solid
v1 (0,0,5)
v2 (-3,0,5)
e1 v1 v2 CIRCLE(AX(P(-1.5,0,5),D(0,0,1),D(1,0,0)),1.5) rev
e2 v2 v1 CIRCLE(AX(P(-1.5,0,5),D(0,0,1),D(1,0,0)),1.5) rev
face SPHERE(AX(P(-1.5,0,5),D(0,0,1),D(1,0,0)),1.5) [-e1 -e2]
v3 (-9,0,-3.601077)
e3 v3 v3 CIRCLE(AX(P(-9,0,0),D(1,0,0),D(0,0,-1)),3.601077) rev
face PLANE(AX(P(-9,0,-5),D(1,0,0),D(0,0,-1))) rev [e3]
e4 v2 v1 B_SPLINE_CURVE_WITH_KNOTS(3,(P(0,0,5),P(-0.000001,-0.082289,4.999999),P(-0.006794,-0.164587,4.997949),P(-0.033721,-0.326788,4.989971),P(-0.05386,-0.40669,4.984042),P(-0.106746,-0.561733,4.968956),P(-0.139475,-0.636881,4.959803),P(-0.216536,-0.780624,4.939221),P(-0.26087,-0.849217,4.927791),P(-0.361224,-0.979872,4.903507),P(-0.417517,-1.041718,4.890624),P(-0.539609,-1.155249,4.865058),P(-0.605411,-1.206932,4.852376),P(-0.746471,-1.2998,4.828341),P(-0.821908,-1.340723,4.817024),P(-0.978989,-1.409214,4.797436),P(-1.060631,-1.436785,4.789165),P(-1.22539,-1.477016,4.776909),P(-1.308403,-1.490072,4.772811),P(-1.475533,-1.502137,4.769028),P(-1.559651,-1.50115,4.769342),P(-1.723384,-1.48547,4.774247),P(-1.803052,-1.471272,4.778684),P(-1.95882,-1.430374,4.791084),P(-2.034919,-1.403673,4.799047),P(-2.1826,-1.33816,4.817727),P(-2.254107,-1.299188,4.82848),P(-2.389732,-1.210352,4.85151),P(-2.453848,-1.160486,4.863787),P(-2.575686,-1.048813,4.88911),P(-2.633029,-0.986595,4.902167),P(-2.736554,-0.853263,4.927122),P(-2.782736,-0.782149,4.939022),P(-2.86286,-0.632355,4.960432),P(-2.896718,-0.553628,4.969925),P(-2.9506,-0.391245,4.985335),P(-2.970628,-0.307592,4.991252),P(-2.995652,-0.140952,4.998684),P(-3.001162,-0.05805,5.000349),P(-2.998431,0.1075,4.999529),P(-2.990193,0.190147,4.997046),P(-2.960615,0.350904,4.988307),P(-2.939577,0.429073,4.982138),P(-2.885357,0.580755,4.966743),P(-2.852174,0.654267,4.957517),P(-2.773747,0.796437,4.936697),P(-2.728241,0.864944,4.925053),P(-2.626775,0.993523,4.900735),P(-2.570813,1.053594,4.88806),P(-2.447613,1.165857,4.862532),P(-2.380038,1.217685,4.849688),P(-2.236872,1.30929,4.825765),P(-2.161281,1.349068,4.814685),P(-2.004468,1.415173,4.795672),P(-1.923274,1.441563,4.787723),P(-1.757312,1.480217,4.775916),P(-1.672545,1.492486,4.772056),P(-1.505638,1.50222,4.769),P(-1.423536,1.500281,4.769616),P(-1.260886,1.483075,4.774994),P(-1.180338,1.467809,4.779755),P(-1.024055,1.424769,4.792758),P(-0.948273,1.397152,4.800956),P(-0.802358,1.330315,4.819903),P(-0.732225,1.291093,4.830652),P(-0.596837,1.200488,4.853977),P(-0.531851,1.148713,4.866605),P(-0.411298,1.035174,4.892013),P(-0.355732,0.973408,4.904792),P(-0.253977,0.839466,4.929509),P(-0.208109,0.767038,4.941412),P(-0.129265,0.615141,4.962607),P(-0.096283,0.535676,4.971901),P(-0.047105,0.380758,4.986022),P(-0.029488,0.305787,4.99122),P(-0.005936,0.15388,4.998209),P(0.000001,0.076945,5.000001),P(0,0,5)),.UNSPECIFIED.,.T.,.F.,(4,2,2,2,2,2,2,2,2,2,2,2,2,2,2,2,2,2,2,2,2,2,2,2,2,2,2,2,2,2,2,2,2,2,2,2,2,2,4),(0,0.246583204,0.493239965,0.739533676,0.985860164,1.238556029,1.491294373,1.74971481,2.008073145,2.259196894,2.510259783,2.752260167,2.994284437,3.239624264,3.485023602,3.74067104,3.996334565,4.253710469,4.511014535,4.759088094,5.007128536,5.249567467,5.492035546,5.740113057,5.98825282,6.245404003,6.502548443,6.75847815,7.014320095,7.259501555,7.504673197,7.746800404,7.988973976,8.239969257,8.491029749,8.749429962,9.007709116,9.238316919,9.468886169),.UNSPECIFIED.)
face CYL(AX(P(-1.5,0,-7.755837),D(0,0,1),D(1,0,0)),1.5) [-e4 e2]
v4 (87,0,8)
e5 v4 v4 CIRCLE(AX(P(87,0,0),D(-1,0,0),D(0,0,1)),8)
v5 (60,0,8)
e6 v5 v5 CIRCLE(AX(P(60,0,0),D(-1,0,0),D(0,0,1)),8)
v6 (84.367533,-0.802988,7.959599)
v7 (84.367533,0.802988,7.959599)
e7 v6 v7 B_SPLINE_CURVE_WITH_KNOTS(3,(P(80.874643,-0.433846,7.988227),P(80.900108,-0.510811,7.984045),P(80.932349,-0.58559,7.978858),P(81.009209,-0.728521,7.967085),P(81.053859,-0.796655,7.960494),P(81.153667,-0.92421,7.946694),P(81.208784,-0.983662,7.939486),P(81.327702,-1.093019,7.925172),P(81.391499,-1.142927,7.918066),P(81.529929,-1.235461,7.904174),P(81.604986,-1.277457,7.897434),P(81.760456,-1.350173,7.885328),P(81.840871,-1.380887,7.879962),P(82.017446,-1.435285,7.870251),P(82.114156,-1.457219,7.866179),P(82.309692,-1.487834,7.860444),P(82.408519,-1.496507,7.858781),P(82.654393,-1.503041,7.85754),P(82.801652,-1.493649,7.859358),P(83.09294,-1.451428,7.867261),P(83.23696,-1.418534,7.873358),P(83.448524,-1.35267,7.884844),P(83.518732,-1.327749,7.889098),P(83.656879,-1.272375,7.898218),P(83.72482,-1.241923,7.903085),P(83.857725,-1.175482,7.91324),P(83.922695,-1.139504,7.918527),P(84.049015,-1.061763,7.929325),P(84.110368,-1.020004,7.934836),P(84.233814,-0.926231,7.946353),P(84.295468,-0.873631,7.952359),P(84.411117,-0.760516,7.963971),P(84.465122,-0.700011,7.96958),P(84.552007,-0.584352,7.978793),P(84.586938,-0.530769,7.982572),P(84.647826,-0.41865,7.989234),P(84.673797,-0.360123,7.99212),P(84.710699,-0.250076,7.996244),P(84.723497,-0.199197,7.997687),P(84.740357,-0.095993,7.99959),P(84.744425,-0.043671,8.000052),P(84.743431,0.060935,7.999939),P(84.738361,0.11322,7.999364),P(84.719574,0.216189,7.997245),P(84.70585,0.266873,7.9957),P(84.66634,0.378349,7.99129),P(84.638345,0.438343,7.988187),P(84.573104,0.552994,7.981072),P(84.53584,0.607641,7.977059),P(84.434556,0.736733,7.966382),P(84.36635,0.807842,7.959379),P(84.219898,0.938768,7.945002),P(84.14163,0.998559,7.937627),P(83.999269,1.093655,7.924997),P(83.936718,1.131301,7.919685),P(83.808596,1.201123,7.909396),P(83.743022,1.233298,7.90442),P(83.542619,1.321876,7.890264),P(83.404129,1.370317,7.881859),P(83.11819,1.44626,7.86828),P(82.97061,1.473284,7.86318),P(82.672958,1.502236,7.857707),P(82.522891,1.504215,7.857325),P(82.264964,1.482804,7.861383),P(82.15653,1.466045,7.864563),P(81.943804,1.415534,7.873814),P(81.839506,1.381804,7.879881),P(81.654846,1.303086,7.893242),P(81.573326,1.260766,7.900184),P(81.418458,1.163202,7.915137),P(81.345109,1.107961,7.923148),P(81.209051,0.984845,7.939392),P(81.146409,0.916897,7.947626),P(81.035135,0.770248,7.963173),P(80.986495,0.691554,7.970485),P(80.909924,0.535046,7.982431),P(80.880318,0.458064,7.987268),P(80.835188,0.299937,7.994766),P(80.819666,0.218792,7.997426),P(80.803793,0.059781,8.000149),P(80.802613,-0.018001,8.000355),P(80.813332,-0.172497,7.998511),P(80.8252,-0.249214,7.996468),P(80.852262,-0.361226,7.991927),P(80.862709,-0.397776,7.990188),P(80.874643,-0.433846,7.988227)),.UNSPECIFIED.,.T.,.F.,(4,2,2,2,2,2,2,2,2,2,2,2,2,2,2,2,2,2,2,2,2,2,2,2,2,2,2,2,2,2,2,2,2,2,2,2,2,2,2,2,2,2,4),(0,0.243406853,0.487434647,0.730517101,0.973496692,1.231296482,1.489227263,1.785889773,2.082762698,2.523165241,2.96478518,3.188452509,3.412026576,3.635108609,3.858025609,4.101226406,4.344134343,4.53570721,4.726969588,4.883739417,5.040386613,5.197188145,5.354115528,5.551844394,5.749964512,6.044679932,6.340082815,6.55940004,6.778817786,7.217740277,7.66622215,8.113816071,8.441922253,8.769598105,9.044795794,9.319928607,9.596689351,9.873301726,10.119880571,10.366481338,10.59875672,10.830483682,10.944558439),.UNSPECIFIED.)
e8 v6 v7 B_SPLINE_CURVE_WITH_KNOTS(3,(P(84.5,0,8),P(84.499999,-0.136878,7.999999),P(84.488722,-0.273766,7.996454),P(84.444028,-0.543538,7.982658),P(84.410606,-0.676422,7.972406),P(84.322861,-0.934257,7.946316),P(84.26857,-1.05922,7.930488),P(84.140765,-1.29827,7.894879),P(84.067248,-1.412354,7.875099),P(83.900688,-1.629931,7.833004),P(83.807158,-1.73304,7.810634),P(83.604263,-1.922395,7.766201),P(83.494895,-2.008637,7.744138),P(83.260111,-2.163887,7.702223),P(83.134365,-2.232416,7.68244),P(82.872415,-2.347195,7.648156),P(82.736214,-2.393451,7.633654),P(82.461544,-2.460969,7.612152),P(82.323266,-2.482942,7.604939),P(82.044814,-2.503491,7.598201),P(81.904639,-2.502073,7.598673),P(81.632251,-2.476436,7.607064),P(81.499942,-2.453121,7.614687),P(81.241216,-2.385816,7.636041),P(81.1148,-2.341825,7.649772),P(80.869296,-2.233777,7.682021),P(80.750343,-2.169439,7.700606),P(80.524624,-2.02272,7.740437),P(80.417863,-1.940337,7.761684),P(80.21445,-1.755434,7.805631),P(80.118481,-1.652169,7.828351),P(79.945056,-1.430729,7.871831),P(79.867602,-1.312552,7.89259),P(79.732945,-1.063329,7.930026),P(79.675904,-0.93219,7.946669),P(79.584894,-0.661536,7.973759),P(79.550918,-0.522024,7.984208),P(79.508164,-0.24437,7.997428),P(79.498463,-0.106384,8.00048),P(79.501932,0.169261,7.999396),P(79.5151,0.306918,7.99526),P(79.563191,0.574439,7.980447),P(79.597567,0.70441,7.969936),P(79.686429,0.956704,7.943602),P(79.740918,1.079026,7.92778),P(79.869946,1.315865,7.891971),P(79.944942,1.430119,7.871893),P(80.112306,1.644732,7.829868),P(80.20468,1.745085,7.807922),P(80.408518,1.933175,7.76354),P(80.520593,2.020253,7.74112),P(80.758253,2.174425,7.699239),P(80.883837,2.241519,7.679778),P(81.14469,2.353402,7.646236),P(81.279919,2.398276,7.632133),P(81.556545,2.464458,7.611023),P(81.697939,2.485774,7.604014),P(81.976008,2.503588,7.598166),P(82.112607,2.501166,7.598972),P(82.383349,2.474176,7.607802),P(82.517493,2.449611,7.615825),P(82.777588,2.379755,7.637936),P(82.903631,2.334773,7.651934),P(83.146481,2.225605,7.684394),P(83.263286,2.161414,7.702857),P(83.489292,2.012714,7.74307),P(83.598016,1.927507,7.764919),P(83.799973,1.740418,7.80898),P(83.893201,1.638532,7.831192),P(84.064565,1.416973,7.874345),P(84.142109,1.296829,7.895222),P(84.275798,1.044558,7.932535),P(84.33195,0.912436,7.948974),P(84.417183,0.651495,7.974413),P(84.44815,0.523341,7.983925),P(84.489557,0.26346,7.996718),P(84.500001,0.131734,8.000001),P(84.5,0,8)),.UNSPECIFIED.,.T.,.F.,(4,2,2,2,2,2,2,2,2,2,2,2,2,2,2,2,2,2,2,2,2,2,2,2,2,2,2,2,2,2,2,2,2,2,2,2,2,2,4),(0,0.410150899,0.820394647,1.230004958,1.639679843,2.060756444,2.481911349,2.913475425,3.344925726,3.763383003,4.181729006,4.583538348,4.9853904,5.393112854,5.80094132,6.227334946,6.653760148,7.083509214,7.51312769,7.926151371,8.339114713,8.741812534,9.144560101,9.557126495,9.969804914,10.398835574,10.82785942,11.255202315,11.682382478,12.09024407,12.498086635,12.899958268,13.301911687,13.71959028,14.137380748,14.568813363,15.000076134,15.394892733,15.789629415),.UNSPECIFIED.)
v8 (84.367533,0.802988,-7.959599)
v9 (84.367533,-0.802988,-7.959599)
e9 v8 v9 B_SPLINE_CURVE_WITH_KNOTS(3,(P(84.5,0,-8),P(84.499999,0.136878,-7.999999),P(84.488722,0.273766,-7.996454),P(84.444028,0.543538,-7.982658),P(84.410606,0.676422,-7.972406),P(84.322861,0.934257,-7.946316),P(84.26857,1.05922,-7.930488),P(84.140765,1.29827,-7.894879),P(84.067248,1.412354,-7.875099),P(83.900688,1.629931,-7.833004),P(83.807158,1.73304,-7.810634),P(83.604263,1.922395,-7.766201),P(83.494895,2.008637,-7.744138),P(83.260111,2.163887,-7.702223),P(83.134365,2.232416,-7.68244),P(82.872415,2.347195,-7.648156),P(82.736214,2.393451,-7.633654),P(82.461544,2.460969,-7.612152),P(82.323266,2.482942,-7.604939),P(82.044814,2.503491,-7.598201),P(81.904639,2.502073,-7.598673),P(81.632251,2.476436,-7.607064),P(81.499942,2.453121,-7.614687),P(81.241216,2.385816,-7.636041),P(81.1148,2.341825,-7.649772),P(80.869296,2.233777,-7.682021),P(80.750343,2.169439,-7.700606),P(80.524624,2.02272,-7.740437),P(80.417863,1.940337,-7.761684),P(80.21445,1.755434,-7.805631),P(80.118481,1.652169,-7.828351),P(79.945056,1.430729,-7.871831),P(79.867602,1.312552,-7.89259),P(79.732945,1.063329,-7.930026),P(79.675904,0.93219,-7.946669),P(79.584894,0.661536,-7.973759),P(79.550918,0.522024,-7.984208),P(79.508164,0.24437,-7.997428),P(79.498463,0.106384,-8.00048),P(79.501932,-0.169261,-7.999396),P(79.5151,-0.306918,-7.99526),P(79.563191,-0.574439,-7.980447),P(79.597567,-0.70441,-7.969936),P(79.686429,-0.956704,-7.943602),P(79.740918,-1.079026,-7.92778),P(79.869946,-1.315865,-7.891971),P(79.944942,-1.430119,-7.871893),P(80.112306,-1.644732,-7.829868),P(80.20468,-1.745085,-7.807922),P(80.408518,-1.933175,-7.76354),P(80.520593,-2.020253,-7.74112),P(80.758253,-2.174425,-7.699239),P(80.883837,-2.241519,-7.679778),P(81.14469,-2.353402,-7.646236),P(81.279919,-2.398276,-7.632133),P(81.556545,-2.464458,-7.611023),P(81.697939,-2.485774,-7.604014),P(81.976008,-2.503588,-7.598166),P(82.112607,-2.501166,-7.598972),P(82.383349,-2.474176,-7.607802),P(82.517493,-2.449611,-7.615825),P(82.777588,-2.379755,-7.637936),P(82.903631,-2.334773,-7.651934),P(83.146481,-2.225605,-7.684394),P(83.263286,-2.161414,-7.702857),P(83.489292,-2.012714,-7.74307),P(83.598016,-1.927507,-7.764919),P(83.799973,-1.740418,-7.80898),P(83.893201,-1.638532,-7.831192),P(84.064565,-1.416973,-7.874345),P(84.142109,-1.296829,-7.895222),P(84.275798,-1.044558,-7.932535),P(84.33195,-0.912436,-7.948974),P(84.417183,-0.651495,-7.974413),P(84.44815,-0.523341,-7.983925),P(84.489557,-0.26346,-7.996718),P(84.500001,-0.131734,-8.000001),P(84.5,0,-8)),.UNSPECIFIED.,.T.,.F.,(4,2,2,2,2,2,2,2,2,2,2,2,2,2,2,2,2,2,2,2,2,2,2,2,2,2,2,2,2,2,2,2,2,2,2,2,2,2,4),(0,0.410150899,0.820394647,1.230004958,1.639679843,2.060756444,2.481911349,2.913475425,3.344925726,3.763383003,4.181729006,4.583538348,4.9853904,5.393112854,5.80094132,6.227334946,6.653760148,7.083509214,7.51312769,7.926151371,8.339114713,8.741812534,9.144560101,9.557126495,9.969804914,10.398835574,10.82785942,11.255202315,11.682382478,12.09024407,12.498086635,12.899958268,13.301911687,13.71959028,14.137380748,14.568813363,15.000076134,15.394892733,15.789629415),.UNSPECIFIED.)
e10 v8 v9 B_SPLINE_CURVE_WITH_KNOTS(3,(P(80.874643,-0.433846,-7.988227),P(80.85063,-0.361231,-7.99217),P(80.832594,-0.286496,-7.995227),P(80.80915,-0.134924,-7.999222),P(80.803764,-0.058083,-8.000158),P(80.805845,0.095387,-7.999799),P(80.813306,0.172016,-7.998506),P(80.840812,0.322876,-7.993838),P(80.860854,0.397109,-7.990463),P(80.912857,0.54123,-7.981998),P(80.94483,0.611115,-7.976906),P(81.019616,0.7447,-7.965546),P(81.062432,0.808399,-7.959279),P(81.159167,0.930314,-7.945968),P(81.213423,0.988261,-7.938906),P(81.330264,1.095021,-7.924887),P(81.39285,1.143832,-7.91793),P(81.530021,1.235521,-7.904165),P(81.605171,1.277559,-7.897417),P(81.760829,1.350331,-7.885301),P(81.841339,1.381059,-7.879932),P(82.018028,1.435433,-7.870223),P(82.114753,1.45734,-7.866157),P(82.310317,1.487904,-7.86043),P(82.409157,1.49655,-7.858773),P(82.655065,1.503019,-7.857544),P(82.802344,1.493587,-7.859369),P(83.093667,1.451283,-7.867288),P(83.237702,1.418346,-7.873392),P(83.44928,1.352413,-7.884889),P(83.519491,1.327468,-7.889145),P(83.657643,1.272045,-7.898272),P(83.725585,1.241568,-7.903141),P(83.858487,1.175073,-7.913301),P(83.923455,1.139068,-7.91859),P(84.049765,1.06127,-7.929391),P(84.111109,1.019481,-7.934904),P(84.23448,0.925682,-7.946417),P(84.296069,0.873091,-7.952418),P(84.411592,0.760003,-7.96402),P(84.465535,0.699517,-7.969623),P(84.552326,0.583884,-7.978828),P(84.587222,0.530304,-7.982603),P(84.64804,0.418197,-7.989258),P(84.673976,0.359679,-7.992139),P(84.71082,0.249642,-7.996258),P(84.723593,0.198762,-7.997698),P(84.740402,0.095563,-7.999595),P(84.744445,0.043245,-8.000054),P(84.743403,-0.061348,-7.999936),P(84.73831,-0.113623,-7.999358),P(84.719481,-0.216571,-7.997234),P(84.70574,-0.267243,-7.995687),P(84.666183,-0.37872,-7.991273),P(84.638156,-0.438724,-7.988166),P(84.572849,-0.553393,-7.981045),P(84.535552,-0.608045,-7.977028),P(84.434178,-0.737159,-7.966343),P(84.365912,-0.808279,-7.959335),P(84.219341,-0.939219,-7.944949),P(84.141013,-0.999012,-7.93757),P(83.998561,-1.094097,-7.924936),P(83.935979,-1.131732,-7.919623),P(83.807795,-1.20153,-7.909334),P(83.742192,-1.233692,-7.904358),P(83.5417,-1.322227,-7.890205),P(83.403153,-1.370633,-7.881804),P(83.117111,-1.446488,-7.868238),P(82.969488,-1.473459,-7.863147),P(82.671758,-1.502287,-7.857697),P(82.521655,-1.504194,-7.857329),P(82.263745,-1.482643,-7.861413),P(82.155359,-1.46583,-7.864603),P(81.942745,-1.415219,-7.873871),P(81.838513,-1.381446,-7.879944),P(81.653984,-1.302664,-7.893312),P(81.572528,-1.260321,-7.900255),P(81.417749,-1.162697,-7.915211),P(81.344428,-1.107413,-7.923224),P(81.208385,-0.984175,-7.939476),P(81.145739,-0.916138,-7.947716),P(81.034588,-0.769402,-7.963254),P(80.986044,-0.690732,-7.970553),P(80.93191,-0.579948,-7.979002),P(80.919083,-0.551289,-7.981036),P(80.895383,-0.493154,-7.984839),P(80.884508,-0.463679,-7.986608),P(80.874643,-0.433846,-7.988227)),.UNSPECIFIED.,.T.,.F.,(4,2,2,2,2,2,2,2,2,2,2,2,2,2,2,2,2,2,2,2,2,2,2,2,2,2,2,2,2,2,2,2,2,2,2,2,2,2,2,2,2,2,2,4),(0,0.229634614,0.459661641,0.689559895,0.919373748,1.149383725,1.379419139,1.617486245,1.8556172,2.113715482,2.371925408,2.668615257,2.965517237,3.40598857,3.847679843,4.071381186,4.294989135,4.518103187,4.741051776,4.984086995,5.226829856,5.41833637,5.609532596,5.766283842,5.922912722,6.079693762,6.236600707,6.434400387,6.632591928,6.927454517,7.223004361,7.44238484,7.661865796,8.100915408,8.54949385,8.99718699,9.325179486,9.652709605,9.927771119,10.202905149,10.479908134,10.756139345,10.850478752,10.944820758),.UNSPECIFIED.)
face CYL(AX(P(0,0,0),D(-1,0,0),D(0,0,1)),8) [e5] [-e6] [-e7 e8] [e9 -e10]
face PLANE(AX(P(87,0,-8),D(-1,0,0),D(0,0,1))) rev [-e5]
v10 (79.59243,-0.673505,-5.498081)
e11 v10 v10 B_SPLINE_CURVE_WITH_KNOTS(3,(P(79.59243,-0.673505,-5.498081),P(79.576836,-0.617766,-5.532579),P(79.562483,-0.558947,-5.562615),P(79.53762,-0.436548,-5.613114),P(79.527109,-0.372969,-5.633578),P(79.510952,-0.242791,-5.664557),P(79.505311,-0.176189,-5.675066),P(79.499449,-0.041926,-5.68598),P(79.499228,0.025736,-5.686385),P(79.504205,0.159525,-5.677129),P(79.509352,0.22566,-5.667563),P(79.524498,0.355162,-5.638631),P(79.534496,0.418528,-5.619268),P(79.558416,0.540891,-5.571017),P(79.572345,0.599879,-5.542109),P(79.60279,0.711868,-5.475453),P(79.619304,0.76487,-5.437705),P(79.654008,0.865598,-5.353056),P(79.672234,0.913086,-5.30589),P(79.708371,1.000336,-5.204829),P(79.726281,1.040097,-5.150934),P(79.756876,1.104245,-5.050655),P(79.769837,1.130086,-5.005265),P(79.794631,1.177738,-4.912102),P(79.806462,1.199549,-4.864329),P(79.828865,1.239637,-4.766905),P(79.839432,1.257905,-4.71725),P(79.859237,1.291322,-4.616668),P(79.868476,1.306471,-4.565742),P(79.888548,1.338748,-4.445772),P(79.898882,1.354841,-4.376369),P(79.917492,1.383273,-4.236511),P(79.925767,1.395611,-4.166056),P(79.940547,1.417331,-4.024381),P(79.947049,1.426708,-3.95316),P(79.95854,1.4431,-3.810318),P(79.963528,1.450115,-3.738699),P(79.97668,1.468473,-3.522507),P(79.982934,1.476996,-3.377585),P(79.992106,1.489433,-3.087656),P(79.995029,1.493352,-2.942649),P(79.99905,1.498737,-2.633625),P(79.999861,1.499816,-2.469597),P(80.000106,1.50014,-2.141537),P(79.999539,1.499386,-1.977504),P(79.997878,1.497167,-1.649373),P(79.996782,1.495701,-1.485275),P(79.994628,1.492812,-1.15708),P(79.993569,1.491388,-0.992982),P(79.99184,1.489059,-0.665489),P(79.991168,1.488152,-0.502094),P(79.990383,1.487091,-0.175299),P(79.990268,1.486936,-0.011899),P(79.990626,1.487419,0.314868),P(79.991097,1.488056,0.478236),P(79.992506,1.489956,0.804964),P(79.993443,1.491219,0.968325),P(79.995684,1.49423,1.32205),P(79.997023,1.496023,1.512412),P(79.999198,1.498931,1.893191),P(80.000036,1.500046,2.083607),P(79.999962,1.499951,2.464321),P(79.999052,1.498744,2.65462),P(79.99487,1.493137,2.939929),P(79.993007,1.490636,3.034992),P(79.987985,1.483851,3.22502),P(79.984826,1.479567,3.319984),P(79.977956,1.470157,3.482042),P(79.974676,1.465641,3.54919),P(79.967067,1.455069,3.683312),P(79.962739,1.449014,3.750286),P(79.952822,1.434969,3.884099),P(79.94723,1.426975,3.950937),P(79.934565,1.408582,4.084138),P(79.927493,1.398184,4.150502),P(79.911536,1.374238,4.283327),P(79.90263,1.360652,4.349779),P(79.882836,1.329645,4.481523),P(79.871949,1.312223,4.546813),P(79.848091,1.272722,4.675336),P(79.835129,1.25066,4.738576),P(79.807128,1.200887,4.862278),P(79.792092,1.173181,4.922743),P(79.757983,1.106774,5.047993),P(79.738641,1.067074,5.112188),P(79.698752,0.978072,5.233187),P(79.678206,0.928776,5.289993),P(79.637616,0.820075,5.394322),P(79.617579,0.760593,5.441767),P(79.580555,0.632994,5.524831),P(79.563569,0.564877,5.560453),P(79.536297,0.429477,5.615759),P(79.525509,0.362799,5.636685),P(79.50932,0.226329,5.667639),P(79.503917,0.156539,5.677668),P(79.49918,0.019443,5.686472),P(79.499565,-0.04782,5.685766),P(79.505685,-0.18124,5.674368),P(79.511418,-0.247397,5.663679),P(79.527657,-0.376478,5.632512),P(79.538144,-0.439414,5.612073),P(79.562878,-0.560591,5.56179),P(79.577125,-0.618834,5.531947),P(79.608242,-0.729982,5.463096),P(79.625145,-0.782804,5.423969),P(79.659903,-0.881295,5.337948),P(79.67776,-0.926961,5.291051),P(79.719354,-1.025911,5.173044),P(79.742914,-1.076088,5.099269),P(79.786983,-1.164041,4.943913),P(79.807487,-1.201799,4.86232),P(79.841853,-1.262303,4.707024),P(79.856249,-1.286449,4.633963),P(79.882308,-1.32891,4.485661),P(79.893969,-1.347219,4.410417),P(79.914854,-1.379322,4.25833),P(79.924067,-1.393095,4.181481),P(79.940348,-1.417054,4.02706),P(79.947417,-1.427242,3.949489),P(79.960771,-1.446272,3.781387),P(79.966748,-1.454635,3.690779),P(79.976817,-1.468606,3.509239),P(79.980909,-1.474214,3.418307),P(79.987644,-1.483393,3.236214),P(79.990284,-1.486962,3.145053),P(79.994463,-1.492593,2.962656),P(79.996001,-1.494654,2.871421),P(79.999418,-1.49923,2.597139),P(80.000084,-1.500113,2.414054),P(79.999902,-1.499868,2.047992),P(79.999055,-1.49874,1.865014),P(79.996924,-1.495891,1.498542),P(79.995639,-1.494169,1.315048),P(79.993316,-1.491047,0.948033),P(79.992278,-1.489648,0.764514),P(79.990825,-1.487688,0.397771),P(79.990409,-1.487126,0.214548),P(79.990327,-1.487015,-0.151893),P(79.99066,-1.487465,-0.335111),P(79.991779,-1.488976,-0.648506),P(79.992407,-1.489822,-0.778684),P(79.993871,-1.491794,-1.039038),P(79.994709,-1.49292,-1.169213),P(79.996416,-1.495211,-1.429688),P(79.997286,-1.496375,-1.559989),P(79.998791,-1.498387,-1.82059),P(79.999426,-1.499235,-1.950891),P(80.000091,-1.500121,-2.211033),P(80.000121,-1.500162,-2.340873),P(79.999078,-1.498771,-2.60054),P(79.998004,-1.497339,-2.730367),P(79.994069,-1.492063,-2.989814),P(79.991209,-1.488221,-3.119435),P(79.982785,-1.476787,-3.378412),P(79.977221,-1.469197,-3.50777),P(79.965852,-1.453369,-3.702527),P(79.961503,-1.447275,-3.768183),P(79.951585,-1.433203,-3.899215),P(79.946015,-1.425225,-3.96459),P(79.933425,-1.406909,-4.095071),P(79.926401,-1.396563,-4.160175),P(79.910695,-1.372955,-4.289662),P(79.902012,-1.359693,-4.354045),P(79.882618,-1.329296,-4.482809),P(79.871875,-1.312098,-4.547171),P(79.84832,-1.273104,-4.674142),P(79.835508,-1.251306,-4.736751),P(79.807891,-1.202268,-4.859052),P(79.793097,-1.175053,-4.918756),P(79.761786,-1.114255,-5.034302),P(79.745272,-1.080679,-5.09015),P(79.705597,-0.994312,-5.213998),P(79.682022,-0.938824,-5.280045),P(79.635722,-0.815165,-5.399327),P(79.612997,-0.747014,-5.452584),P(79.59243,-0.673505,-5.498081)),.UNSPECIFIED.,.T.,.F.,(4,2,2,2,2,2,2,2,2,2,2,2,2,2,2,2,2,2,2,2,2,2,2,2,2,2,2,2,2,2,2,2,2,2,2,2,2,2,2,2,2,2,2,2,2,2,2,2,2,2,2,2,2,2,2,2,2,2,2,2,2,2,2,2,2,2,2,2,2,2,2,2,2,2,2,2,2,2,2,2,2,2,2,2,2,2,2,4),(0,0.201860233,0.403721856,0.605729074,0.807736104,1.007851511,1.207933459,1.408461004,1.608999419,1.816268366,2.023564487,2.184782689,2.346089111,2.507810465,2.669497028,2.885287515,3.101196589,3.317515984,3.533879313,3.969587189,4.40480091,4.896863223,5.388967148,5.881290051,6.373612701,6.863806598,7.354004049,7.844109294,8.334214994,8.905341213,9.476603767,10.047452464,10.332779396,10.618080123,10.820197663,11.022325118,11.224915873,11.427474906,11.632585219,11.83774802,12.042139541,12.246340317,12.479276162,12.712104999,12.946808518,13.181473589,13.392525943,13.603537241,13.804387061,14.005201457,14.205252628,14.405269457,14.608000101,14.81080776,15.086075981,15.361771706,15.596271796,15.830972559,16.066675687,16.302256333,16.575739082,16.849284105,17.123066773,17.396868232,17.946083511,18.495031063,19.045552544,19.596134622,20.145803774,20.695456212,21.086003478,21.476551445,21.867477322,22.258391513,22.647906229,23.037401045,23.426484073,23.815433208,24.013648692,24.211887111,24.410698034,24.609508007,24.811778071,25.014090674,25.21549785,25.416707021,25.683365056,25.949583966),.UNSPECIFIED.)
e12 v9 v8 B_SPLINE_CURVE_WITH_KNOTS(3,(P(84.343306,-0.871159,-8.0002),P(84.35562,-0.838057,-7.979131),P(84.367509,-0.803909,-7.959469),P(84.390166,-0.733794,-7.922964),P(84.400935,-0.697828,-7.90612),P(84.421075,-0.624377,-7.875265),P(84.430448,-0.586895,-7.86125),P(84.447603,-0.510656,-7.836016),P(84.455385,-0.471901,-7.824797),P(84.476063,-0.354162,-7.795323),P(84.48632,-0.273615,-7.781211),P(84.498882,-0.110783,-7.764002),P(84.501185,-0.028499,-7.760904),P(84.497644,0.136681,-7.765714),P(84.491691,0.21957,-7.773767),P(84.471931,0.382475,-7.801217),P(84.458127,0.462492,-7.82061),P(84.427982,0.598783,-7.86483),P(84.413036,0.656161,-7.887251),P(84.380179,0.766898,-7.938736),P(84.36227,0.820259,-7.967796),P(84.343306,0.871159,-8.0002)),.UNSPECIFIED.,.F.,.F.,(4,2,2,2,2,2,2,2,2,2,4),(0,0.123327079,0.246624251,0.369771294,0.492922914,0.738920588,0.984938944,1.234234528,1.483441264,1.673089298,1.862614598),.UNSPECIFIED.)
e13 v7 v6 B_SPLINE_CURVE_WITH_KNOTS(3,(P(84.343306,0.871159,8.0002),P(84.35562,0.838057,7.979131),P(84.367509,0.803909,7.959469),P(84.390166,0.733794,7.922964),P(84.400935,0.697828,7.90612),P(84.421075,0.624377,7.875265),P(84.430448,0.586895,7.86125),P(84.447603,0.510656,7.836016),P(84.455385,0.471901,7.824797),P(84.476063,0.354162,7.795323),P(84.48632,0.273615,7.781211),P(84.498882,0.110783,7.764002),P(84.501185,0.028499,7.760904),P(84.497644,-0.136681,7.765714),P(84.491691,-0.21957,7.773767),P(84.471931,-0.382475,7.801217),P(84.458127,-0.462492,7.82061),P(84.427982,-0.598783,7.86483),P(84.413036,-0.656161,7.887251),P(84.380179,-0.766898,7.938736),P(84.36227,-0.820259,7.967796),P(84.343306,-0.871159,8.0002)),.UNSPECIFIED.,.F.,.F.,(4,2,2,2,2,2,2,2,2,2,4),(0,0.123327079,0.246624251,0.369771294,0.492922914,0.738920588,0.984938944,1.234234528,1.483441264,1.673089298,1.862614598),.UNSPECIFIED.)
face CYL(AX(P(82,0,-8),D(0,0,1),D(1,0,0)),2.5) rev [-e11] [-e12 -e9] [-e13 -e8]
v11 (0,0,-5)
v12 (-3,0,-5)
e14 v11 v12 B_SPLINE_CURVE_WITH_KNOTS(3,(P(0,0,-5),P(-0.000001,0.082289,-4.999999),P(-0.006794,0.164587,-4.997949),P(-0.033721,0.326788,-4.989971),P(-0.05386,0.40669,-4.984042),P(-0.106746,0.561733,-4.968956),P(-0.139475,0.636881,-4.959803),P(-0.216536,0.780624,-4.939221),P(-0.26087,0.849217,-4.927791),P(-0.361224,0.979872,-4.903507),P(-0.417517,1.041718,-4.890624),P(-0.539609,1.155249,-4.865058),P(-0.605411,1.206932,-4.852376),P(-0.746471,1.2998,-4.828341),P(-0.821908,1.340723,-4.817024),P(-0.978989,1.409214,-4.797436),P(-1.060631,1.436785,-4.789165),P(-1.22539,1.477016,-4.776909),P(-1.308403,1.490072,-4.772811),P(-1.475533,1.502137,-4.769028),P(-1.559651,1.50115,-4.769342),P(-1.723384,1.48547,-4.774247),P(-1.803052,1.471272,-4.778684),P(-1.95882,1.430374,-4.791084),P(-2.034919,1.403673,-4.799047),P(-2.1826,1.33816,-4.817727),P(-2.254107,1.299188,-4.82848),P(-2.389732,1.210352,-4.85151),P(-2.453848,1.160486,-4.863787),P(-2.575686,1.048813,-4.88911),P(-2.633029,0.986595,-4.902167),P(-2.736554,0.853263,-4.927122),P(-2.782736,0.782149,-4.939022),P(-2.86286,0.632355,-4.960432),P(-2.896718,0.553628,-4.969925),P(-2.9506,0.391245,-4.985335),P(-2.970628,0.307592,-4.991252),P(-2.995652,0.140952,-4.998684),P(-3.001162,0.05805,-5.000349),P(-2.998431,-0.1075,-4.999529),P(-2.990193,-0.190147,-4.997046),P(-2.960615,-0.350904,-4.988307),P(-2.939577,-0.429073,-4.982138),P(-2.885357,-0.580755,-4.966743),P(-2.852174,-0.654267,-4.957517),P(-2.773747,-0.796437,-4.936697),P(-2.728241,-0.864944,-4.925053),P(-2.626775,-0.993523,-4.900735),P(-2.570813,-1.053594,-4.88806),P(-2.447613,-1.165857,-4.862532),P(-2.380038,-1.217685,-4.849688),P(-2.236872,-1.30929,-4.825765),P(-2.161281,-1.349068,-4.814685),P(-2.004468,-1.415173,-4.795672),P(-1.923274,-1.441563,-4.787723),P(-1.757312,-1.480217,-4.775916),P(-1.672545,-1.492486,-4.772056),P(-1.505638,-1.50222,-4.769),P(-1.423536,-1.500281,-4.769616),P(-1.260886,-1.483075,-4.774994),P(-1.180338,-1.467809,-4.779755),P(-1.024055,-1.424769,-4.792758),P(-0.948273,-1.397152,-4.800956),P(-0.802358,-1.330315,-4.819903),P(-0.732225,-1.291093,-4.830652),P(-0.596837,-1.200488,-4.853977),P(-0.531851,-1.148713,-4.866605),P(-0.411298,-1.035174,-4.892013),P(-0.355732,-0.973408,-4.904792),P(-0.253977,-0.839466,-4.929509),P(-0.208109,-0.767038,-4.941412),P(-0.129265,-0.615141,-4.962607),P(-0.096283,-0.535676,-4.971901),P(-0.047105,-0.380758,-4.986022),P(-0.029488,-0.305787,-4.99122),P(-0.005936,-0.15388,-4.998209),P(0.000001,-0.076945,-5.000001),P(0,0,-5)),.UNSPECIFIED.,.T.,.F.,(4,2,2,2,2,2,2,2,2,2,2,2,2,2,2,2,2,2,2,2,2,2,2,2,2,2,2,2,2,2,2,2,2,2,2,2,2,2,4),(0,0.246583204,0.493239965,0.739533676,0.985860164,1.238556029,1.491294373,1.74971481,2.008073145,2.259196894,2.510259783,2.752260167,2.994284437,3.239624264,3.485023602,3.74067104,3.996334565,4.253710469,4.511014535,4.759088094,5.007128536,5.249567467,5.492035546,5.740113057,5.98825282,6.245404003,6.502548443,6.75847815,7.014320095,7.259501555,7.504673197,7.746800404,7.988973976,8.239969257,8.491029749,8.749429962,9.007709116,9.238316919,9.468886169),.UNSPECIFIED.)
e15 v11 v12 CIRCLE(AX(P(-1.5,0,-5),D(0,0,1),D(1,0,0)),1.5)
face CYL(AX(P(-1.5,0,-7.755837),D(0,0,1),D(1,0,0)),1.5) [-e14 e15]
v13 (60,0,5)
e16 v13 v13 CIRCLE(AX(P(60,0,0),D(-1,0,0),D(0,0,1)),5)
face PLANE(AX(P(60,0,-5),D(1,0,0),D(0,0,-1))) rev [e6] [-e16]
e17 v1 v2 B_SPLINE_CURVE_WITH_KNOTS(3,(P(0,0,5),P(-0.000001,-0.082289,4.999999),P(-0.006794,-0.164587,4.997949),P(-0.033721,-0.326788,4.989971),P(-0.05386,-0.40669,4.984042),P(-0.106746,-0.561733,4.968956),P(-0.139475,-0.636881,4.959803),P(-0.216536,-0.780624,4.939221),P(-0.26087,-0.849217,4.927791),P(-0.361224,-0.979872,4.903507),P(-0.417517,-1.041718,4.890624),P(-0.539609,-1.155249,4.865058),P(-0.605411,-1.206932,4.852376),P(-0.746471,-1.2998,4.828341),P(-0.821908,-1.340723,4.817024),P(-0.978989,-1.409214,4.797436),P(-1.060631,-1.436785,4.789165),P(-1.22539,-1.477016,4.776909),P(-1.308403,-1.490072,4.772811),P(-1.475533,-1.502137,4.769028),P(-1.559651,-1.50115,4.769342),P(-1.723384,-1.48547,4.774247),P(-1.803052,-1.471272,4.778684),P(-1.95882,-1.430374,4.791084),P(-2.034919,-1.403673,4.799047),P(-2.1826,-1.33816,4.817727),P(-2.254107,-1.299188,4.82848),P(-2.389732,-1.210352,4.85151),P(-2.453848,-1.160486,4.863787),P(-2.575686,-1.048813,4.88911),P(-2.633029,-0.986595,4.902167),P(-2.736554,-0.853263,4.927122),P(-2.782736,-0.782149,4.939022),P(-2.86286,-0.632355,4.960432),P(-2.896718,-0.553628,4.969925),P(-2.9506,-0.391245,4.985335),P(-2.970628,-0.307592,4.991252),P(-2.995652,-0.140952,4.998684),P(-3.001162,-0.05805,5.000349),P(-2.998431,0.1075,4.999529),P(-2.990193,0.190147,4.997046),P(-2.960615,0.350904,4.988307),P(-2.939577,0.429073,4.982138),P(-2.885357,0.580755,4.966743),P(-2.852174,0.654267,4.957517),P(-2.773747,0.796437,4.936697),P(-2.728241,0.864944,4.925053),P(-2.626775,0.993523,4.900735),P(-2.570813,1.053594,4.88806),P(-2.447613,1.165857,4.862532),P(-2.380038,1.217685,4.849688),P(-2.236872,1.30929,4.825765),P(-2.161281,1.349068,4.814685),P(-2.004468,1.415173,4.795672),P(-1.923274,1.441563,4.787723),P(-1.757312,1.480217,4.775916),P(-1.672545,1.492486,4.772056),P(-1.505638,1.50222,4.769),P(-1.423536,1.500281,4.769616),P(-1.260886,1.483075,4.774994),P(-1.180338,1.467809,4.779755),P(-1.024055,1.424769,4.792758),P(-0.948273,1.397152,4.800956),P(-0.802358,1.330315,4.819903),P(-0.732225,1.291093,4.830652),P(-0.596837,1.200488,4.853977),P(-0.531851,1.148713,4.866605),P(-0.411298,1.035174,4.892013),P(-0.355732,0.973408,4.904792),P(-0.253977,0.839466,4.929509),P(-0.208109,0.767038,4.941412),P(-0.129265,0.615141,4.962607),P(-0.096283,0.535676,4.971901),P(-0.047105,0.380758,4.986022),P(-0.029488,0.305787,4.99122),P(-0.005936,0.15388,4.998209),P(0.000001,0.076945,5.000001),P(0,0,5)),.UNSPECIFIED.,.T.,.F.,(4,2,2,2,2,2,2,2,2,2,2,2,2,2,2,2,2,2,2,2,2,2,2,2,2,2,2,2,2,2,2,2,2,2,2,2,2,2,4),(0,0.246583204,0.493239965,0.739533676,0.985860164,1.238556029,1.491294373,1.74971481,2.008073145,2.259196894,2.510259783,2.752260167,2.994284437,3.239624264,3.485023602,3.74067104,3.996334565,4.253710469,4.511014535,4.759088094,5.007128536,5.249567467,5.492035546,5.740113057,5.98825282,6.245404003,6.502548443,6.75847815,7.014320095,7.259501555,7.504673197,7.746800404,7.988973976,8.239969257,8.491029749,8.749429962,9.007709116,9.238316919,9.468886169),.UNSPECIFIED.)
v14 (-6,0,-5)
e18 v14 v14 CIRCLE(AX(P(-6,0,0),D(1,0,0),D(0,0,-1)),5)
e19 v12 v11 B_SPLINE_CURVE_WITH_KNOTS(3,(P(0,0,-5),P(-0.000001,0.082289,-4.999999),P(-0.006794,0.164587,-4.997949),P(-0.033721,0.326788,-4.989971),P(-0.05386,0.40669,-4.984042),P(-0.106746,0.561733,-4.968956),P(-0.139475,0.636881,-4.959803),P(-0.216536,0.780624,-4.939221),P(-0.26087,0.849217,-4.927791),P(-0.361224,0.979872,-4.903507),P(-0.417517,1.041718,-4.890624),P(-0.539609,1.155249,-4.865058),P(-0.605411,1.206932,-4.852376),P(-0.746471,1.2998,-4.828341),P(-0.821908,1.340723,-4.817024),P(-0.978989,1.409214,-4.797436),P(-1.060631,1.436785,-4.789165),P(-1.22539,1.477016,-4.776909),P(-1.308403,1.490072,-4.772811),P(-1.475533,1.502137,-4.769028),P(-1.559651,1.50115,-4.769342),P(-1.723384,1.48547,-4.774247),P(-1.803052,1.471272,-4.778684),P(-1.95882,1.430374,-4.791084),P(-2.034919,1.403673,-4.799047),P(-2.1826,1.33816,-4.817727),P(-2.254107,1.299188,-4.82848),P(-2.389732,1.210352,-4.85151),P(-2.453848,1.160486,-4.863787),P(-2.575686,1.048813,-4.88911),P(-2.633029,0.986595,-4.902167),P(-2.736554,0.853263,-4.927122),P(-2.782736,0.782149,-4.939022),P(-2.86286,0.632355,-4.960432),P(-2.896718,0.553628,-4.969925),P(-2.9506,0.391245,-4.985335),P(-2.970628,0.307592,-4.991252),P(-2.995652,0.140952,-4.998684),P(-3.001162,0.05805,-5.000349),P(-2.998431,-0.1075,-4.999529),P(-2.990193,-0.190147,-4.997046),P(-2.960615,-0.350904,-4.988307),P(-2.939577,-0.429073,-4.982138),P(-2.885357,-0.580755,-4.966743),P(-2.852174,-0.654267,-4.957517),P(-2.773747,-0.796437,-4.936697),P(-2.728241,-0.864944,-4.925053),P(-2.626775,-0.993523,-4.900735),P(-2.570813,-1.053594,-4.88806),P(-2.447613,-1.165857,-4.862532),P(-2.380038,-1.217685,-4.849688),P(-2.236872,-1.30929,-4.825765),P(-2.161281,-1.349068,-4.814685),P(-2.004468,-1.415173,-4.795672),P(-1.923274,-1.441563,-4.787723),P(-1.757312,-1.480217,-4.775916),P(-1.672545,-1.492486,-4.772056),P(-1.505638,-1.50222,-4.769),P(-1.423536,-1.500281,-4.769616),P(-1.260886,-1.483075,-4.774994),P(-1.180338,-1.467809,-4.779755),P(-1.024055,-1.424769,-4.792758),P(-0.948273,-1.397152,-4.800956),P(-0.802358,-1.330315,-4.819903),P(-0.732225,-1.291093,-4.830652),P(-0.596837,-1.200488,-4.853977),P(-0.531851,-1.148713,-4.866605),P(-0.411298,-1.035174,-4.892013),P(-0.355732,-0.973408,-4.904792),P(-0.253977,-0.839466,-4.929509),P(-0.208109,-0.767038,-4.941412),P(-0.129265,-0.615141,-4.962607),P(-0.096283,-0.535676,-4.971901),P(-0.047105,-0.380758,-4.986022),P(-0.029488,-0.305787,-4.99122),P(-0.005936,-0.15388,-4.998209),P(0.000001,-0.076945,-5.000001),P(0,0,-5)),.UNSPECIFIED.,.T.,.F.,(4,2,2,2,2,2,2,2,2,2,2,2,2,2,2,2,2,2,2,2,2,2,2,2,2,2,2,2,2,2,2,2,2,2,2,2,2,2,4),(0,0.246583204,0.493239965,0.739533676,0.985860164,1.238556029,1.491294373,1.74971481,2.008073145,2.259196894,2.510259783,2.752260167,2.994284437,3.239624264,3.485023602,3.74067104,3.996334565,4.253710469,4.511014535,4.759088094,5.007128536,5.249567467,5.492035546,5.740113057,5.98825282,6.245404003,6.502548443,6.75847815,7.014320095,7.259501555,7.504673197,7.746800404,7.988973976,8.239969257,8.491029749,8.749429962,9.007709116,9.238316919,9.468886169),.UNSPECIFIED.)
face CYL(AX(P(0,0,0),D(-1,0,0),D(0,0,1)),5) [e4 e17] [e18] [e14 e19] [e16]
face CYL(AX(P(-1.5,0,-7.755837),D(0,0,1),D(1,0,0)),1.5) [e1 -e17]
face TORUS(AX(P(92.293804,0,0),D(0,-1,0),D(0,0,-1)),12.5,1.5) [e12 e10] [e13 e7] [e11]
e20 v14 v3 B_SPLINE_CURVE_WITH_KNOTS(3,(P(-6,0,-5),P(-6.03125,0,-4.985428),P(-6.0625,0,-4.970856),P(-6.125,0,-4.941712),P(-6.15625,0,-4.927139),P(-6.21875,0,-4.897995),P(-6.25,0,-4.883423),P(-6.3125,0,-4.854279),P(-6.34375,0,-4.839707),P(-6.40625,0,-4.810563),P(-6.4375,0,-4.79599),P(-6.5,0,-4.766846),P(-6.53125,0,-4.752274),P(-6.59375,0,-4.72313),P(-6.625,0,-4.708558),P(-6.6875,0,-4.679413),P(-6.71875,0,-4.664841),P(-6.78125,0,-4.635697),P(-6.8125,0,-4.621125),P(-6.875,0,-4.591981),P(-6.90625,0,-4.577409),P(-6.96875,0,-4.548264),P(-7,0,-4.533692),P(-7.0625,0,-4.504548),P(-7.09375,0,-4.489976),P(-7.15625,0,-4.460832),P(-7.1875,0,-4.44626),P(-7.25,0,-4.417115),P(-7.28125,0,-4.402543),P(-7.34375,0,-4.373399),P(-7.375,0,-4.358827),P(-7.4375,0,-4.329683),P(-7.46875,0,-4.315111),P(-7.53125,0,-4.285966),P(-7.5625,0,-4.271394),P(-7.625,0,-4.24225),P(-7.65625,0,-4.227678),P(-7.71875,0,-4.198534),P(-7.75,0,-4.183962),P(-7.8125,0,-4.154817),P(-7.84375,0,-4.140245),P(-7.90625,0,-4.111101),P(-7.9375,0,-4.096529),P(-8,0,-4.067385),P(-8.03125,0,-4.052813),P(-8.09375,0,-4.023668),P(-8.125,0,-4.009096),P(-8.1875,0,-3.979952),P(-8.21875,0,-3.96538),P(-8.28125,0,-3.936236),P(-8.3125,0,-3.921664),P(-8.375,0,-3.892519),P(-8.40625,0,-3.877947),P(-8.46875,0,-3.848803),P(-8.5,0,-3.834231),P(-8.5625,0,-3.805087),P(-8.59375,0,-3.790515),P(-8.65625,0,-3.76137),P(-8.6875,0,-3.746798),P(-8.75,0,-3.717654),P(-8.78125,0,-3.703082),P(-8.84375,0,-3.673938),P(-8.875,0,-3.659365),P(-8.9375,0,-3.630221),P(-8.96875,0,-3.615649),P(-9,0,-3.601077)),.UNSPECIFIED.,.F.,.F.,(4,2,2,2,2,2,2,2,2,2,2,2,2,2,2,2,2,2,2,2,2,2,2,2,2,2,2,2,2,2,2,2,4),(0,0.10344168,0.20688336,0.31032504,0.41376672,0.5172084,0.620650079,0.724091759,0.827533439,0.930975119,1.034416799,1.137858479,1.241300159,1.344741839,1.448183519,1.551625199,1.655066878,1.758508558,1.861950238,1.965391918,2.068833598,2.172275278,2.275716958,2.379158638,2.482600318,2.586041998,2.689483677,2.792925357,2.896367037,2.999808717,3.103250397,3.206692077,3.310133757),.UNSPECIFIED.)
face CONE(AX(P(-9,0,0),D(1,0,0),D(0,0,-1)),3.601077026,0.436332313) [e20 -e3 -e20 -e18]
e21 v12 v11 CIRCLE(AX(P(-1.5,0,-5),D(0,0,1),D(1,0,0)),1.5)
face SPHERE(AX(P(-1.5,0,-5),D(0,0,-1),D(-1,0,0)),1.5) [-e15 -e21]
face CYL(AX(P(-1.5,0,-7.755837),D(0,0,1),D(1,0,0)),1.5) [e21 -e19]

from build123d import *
from build123d.topology import SkipClean

# Parameters (mm, degrees)
CHAMFER1_SIZE           = 3
CHAMFER1_SIZE2          = 1.398922974
SKETCH2_W               = 1.5
SKETCH2_H               = 13
FILLET1_R               = 1.5
CUT_EXTRUDE1_DEPTH      = 88.732548122
CUT_EXTRUDE1_DEPTH_BACK = 88.732548122
SKETCH3_R               = 2.5
SKETCH5_R               = 1.5


with BuildPart() as part:
    # Sketch1 → Revolve1 (revolve)
    with BuildSketch(Plane(origin=(0, 0, 0), x_dir=(1, 0, 0), z_dir=(0, 1, 0)), mode=Mode.PRIVATE) as revolve1_sk:
        Polygon((0, 5), (-9, 5), (-9, 0), (87, 0), (87, 8), (60, 8), (60, 5), align=None)
    revolve(revolve1_sk.sketch.rotate(Axis((0, 0, 0), (1, 0, 0)), 180), axis=Axis((0, 0, 0), (1, 0, 0)))

    # Chamfer1
    chamfer1_edges = [part.edges().sort_by_distance(p)[0] for p in [
        (-9, 0, -5),
    ]]
    chamfer1_side = [part.faces().sort_by_distance(p)[0] for p in [
        (25.5, 0, -5),
    ]]
    chamfer(chamfer1_edges, length=CHAMFER1_SIZE, length2=CHAMFER1_SIZE2, reference=chamfer1_side[0])

    # Sketch2 → Revolve2 (revolve)
    with BuildSketch(Plane(origin=(0, 0, 0), x_dir=(1, 0, 0), z_dir=(0, 1, 0))):
        with Locations((-0.75, 0)):
            Rectangle(SKETCH2_W, SKETCH2_H)
    revolve(axis=Axis((-1.5, 0, -7.755836722), (0, 0, -1)))

    # Fillet1
    fillet1_edges = [part.edges().sort_by_distance(p)[0] for p in [
        (-3, 0, -6.5),
        (-3, 0, 6.5),
    ]]
    fillet(fillet1_edges, radius=FILLET1_R - 0.0001)  # a hair under: the kernel refuses the full size

    # Sketch3 → Cut-Extrude1 (cut, two sides: drawn at the far end of the back side and taken through both)
    with BuildSketch(Plane.XY.offset(-CUT_EXTRUDE1_DEPTH_BACK)):
        with Locations((82, 0)):
            Circle(SKETCH3_R)
    extrude(amount=CUT_EXTRUDE1_DEPTH + CUT_EXTRUDE1_DEPTH_BACK, mode=Mode.SUBTRACT)

    # Sketch5 → Revolve3 (revolve)
    with SkipClean():  # the faces are left unmerged after this step: merging them gives an invalid solid
        with BuildSketch(Plane.XY, mode=Mode.PRIVATE) as revolve3_sk:
            with Locations((79.793803516, 0)):
                Circle(SKETCH5_R)
        revolve(revolve3_sk.sketch.rotate(Axis((92.293803516, 0, 0), (0, 1, 0)), 158.32912017), axis=Axis((92.293803516, 0, 0), (0, 1, 0)))


solid = part.part
